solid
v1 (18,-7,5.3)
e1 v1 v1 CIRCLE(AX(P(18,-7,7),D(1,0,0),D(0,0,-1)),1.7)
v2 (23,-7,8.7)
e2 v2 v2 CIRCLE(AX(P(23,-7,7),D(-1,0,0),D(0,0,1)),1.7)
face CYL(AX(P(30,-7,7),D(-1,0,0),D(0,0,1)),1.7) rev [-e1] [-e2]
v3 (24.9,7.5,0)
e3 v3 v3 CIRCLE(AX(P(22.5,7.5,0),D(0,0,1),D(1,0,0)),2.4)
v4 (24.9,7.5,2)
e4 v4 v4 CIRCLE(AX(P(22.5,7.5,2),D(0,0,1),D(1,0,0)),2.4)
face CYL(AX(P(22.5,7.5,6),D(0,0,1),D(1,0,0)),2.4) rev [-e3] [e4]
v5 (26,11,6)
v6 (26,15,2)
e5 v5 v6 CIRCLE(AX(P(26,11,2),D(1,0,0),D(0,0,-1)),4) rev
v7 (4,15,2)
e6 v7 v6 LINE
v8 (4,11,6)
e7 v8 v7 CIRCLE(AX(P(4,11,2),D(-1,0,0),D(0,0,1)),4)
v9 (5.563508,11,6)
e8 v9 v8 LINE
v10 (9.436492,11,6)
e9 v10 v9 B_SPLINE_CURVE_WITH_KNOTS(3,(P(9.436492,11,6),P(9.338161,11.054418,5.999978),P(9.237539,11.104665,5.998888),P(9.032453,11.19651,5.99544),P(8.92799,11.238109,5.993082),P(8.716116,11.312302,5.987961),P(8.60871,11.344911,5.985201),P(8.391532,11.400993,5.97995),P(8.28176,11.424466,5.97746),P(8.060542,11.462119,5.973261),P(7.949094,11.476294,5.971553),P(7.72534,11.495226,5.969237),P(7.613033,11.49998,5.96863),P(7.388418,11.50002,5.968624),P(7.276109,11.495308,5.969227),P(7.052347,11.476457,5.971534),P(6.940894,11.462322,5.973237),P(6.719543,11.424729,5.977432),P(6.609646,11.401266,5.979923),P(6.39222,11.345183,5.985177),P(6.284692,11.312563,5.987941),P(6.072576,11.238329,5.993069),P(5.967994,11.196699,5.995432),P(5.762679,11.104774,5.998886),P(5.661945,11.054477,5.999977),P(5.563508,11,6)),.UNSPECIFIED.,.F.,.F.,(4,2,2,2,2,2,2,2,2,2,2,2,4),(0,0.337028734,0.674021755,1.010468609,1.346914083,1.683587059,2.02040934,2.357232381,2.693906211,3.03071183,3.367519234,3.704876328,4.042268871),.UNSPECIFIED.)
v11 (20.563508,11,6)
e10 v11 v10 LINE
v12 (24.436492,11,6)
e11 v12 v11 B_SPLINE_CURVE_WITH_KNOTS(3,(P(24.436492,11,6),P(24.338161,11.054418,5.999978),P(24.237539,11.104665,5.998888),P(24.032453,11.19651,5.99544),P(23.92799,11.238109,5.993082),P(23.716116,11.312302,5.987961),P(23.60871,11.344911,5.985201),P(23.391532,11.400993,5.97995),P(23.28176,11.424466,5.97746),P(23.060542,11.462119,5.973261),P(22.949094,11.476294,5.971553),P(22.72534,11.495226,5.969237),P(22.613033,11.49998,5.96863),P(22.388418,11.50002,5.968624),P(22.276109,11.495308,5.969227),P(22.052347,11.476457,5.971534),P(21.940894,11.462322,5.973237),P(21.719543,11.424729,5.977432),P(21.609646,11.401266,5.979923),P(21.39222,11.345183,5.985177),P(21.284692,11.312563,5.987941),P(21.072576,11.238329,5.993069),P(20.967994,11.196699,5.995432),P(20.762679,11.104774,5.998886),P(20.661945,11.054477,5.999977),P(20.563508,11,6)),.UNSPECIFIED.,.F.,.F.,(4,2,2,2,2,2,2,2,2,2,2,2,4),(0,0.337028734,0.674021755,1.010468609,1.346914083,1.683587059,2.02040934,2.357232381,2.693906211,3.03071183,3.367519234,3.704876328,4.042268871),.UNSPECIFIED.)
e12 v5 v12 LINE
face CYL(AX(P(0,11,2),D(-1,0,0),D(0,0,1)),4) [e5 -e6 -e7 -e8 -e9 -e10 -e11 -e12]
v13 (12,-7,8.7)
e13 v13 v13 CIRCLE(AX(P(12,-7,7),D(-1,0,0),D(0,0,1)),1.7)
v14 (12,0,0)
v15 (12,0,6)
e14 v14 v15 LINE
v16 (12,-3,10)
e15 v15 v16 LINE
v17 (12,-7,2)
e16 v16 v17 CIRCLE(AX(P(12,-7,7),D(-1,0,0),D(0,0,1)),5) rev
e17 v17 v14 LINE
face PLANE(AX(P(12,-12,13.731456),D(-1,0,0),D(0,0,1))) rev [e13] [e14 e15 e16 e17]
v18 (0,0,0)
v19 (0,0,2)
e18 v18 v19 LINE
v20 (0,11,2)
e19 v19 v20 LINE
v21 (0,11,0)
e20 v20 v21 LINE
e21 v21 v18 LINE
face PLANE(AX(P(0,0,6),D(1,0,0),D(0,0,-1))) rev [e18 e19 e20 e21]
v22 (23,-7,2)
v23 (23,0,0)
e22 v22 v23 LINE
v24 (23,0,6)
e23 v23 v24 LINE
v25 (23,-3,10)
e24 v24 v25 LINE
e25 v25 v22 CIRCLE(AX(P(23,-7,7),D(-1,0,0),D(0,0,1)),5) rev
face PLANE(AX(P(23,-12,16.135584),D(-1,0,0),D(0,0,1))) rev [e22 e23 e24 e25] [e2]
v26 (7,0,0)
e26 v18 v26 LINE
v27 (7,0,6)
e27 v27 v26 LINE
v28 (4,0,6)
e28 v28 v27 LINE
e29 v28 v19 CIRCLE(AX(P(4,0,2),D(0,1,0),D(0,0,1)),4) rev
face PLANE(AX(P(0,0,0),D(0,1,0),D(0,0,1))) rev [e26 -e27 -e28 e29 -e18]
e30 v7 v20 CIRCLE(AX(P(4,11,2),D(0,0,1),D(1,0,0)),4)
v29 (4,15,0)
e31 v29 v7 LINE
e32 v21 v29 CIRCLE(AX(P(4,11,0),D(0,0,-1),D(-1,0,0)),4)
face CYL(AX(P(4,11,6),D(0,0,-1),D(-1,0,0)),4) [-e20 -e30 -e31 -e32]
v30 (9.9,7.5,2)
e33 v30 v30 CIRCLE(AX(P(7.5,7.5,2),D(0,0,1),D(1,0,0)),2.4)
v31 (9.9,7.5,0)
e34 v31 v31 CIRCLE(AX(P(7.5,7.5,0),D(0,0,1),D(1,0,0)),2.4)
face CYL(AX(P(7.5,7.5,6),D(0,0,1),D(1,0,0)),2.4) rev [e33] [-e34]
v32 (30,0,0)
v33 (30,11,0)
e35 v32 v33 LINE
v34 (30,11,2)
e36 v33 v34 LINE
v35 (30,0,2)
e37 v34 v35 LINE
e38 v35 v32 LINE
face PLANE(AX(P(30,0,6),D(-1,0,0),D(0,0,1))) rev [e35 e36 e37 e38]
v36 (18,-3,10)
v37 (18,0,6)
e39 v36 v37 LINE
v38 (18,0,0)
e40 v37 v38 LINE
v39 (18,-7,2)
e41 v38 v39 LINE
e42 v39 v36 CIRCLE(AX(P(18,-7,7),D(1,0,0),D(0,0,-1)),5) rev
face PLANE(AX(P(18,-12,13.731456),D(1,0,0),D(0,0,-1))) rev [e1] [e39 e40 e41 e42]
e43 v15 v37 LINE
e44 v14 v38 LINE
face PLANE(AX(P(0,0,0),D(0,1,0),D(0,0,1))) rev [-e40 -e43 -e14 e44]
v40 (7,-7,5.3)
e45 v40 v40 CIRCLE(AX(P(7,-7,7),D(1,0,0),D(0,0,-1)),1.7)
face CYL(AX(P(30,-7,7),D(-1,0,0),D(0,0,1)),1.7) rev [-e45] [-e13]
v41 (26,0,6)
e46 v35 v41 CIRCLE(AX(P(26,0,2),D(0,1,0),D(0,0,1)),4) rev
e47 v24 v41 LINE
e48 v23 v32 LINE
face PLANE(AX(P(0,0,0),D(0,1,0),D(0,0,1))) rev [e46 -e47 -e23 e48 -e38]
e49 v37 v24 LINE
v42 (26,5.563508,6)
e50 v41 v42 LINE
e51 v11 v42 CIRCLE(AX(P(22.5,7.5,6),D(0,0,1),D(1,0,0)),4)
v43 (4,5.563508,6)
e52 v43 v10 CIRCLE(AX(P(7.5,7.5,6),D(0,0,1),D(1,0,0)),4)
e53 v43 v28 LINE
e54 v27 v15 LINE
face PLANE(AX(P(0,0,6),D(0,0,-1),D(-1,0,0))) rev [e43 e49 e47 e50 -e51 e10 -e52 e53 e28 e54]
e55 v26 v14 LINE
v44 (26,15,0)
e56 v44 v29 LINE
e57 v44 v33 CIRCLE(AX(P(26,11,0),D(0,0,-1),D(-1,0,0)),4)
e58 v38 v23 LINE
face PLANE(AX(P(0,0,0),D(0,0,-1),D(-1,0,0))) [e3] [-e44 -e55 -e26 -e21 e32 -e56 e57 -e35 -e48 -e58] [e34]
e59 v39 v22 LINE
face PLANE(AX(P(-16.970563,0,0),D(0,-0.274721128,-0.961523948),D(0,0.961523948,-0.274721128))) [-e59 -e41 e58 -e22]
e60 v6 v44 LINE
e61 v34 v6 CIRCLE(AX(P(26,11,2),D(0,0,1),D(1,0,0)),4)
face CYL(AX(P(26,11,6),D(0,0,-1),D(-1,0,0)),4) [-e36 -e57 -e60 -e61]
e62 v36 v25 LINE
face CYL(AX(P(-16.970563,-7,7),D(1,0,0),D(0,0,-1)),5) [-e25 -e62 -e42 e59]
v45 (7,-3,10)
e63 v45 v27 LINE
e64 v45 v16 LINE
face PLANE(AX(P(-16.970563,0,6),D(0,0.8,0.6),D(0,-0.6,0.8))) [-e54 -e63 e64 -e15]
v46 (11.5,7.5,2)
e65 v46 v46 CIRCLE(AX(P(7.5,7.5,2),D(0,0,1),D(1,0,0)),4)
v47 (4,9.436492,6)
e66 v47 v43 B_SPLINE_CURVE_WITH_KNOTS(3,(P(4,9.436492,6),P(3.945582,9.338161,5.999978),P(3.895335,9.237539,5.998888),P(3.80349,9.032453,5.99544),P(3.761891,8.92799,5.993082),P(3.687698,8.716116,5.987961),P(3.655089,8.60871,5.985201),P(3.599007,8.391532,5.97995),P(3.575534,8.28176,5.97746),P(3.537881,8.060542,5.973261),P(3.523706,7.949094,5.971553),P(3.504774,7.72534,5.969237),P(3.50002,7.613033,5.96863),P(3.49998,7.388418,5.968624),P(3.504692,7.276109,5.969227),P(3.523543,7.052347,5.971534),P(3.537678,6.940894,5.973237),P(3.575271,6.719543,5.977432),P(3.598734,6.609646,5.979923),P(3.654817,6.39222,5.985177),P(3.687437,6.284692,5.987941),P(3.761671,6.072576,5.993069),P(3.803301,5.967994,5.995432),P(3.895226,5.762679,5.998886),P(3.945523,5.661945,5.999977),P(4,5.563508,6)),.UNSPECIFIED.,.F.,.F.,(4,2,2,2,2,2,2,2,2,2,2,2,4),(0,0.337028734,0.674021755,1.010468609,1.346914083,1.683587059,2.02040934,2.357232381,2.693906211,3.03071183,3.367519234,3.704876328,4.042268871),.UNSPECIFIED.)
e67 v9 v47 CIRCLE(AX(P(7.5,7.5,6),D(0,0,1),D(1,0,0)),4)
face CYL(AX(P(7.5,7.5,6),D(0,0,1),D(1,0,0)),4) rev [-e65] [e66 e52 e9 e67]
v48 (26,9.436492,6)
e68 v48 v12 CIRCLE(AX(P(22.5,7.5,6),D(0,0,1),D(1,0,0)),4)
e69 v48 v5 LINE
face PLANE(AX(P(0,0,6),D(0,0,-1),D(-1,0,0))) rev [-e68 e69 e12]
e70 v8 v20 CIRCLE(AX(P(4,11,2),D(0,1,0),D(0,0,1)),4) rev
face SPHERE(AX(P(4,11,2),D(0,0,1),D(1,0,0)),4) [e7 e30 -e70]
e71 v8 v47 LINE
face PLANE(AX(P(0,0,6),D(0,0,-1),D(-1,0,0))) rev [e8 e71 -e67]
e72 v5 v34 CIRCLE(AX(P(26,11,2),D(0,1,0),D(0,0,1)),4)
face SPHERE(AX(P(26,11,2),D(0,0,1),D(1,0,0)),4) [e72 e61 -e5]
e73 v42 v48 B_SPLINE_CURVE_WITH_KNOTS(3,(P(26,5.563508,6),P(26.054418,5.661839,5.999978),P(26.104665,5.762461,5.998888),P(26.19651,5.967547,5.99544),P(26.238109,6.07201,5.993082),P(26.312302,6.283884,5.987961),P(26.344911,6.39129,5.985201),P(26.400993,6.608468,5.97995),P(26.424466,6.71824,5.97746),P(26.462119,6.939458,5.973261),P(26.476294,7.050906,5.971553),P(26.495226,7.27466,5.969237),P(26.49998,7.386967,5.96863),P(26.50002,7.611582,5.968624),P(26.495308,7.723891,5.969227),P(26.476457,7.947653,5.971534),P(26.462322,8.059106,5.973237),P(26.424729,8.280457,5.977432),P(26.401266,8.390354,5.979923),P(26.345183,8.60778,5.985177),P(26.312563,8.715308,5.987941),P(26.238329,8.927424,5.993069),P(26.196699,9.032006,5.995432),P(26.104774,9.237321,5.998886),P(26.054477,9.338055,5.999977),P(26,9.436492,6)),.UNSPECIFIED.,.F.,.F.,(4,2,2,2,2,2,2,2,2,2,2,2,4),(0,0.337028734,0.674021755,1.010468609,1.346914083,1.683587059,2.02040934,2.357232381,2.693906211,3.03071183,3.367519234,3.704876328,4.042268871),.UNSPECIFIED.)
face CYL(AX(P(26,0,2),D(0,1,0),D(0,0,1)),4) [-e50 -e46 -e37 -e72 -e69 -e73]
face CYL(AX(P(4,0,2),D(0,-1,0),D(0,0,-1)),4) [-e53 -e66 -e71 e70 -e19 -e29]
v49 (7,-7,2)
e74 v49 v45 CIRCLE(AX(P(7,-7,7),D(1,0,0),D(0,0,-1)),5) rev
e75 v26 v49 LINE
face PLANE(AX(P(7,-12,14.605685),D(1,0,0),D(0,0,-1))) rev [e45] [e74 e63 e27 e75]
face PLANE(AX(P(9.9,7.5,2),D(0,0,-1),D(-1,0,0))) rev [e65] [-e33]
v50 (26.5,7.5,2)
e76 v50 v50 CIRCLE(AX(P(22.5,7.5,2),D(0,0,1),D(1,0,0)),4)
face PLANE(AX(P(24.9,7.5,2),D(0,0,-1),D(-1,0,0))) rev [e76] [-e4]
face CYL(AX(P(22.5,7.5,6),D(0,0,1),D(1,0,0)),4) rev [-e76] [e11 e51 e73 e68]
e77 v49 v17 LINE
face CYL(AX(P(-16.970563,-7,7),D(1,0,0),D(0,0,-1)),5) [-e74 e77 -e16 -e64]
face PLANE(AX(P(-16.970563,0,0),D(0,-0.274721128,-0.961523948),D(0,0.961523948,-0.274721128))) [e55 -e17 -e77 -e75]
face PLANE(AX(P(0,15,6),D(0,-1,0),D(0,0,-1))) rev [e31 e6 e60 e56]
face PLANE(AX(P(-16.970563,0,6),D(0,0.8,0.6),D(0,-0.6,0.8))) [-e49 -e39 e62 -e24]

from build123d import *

# Parameters (mm, degrees)
SKETCH2_W                      = 30
SKETCH2_H                      = 15
BOSS_EXTRUDE1_DEPTH            = 6
CBORE_FOR_M4_SHCS1_D           = 4.8
CBORE_FOR_M4_SHCS1_CBORE_D     = 8
CBORE_FOR_M4_SHCS1_CBORE_DEPTH = 4
BOSS_EXTRUDE2_DEPTH            = 30
CUT_EXTRUDE1_START             = -15
SKETCH6_W                      = 6
SKETCH6_H                      = 18.030958188
SKETCH6_W_2                    = 16.282501636
SKETCH6_H_2                    = 17.921679654
SKETCH6_W_3                    = 7
SKETCH6_H_3                    = 20.435085946
CUT_EXTRUDE1_DEPTH             = 28.107006543
CUT_EXTRUDE2_DEPTH             = 30.966648128
CUT_EXTRUDE2_DEPTH_BACK        = 30.966648128
SKETCH7_R                      = 1.7
FILLET1_R                      = 4


with BuildPart() as part:
    # Sketch2 → Boss-Extrude1 (new body)
    with BuildSketch(Plane.XY):
        with Locations((15, 7.5)):
            Rectangle(SKETCH2_W, SKETCH2_H)
    extrude(amount=BOSS_EXTRUDE1_DEPTH)

    # CBORE for M4 SHCS1 (through all)
    with Locations(Plane.XY.offset(6)):
        with Locations((7.5, 7.5), (22.5, 7.5)):
            CounterBoreHole(CBORE_FOR_M4_SHCS1_D / 2, CBORE_FOR_M4_SHCS1_CBORE_D / 2, CBORE_FOR_M4_SHCS1_CBORE_DEPTH)

    # Sketch5 → Boss-Extrude2 (add)
    with BuildSketch(Plane(origin=(30, 0, 0), x_dir=(0, 0, -1), z_dir=(1, 0, 0))):
        with BuildLine():
            Line((0, 0), (-2, -7))
            ThreePointArc((-2, -7), (-9.236067977, -11.472135955), (-10, -3))
            Line((-10, -3), (-6, 0))
            Line((-6, 0), (0, 0))
        make_face()
    extrude(amount=-BOSS_EXTRUDE2_DEPTH)

    # Sketch6 → Cut-Extrude1 (cut, through all)
    with BuildSketch(Plane(origin=(0, 15, 0), x_dir=(1, 0, 0), z_dir=(0, 1, 0)).offset(CUT_EXTRUDE1_START)):
        with Locations((15, -4.71597722)):
            Rectangle(SKETCH6_W, SKETCH6_H)
        with Locations((-1.141250818, -5.644844763)):
            Rectangle(SKETCH6_W_2, SKETCH6_H_2)
        with Locations((26.5, -5.918041099)):
            Rectangle(SKETCH6_W_3, SKETCH6_H_3)
    extrude(amount=-CUT_EXTRUDE1_DEPTH, mode=Mode.SUBTRACT)

    # Sketch7 → Cut-Extrude2 (cut, two sides: drawn at the far end of the back side and taken through both)
    with BuildSketch(Plane.ZY.offset(-7).offset(-CUT_EXTRUDE2_DEPTH_BACK)):
        with Locations((7, -7)):
            Circle(SKETCH7_R)
    extrude(amount=CUT_EXTRUDE2_DEPTH + CUT_EXTRUDE2_DEPTH_BACK, mode=Mode.SUBTRACT)

    # Fillet1
    # the kernel refuses this fillet: 4 mm, written as the material it takes off along each edge
    with BuildSketch(Plane(origin=(26, 11, 2), x_dir=(0, 0, 1), z_dir=(1, 0, 0))) as fillet1_piece_1_section:
        Polygon((0, 0), (FILLET1_R, 0), (FILLET1_R, -FILLET1_R), (0, -FILLET1_R), align=None)
    fillet1_piece_1 = extrude(amount=FILLET1_R, mode=Mode.PRIVATE)
    fillet1_piece_1 = fillet1_piece_1 - Plane(origin=(26, 11, 2), x_dir=(0, -0.7071067811865475, -0.7071067811865475), z_dir=(1, 0, 0)) * Sphere(FILLET1_R, mode=Mode.PRIVATE)
    add(fillet1_piece_1, mode=Mode.SUBTRACT)
    with BuildSketch(Plane(origin=(4, 11, 2), x_dir=(0, 0, 1), z_dir=(-1, 0, 0))) as fillet1_piece_2_section:
        Polygon((0, 0), (FILLET1_R, 0), (FILLET1_R, FILLET1_R), (0, FILLET1_R), align=None)
    fillet1_piece_2 = extrude(amount=FILLET1_R, mode=Mode.PRIVATE)
    fillet1_piece_2 = fillet1_piece_2 - Plane(origin=(4, 11, 2), x_dir=(0, -0.7071067811865475, -0.7071067811865475), z_dir=(-1, 0, 0)) * Sphere(FILLET1_R, mode=Mode.PRIVATE)
    add(fillet1_piece_2, mode=Mode.SUBTRACT)
    with BuildSketch(Plane(origin=(30, -10, 6), x_dir=(-1, 0, 0), z_dir=(0, 1, 0))) as fillet1_piece_3:
        with BuildLine():
            CenterArc((FILLET1_R, -FILLET1_R), FILLET1_R, 90, 90)
            Line((0, -FILLET1_R), (0, 0))
            Line((0, 0), (FILLET1_R, 0))
        make_face()
    extrude(amount=21, mode=Mode.SUBTRACT)
    with BuildSketch(Plane(origin=(26, 15, 6), x_dir=(0, -1, 0), z_dir=(-1, 0, 0))) as fillet1_piece_4:
        with BuildLine():
            CenterArc((FILLET1_R, -FILLET1_R), FILLET1_R, 90, 90)
            Line((0, -FILLET1_R), (0, 0))
            Line((0, 0), (FILLET1_R, 0))
        make_face()
    extrude(amount=22, mode=Mode.SUBTRACT)
    with BuildSketch(Plane(origin=(0, 11, 6), x_dir=(0, 0, -1), z_dir=(0, -1, 0))) as fillet1_piece_5:
        with BuildLine():
            CenterArc((FILLET1_R, FILLET1_R), FILLET1_R, 180, 90)
            Line((0, FILLET1_R), (0, 0))
            Line((0, 0), (FILLET1_R, 0))
        make_face()
    extrude(amount=21, mode=Mode.SUBTRACT)
    with BuildSketch(Plane(origin=(0, 15, -10), x_dir=(0, -1, 0), z_dir=(0, 0, 1)), Plane(origin=(30, 15, -10), x_dir=(-1, 0, 0), z_dir=(0, 0, 1))) as fillet1_piece_6:
        with BuildLine():
            CenterArc((FILLET1_R, FILLET1_R), FILLET1_R, 180, 90)
            Line((0, FILLET1_R), (0, 0))
            Line((0, 0), (FILLET1_R, 0))
        make_face()
    extrude(amount=12, mode=Mode.SUBTRACT)


solid = part.part
